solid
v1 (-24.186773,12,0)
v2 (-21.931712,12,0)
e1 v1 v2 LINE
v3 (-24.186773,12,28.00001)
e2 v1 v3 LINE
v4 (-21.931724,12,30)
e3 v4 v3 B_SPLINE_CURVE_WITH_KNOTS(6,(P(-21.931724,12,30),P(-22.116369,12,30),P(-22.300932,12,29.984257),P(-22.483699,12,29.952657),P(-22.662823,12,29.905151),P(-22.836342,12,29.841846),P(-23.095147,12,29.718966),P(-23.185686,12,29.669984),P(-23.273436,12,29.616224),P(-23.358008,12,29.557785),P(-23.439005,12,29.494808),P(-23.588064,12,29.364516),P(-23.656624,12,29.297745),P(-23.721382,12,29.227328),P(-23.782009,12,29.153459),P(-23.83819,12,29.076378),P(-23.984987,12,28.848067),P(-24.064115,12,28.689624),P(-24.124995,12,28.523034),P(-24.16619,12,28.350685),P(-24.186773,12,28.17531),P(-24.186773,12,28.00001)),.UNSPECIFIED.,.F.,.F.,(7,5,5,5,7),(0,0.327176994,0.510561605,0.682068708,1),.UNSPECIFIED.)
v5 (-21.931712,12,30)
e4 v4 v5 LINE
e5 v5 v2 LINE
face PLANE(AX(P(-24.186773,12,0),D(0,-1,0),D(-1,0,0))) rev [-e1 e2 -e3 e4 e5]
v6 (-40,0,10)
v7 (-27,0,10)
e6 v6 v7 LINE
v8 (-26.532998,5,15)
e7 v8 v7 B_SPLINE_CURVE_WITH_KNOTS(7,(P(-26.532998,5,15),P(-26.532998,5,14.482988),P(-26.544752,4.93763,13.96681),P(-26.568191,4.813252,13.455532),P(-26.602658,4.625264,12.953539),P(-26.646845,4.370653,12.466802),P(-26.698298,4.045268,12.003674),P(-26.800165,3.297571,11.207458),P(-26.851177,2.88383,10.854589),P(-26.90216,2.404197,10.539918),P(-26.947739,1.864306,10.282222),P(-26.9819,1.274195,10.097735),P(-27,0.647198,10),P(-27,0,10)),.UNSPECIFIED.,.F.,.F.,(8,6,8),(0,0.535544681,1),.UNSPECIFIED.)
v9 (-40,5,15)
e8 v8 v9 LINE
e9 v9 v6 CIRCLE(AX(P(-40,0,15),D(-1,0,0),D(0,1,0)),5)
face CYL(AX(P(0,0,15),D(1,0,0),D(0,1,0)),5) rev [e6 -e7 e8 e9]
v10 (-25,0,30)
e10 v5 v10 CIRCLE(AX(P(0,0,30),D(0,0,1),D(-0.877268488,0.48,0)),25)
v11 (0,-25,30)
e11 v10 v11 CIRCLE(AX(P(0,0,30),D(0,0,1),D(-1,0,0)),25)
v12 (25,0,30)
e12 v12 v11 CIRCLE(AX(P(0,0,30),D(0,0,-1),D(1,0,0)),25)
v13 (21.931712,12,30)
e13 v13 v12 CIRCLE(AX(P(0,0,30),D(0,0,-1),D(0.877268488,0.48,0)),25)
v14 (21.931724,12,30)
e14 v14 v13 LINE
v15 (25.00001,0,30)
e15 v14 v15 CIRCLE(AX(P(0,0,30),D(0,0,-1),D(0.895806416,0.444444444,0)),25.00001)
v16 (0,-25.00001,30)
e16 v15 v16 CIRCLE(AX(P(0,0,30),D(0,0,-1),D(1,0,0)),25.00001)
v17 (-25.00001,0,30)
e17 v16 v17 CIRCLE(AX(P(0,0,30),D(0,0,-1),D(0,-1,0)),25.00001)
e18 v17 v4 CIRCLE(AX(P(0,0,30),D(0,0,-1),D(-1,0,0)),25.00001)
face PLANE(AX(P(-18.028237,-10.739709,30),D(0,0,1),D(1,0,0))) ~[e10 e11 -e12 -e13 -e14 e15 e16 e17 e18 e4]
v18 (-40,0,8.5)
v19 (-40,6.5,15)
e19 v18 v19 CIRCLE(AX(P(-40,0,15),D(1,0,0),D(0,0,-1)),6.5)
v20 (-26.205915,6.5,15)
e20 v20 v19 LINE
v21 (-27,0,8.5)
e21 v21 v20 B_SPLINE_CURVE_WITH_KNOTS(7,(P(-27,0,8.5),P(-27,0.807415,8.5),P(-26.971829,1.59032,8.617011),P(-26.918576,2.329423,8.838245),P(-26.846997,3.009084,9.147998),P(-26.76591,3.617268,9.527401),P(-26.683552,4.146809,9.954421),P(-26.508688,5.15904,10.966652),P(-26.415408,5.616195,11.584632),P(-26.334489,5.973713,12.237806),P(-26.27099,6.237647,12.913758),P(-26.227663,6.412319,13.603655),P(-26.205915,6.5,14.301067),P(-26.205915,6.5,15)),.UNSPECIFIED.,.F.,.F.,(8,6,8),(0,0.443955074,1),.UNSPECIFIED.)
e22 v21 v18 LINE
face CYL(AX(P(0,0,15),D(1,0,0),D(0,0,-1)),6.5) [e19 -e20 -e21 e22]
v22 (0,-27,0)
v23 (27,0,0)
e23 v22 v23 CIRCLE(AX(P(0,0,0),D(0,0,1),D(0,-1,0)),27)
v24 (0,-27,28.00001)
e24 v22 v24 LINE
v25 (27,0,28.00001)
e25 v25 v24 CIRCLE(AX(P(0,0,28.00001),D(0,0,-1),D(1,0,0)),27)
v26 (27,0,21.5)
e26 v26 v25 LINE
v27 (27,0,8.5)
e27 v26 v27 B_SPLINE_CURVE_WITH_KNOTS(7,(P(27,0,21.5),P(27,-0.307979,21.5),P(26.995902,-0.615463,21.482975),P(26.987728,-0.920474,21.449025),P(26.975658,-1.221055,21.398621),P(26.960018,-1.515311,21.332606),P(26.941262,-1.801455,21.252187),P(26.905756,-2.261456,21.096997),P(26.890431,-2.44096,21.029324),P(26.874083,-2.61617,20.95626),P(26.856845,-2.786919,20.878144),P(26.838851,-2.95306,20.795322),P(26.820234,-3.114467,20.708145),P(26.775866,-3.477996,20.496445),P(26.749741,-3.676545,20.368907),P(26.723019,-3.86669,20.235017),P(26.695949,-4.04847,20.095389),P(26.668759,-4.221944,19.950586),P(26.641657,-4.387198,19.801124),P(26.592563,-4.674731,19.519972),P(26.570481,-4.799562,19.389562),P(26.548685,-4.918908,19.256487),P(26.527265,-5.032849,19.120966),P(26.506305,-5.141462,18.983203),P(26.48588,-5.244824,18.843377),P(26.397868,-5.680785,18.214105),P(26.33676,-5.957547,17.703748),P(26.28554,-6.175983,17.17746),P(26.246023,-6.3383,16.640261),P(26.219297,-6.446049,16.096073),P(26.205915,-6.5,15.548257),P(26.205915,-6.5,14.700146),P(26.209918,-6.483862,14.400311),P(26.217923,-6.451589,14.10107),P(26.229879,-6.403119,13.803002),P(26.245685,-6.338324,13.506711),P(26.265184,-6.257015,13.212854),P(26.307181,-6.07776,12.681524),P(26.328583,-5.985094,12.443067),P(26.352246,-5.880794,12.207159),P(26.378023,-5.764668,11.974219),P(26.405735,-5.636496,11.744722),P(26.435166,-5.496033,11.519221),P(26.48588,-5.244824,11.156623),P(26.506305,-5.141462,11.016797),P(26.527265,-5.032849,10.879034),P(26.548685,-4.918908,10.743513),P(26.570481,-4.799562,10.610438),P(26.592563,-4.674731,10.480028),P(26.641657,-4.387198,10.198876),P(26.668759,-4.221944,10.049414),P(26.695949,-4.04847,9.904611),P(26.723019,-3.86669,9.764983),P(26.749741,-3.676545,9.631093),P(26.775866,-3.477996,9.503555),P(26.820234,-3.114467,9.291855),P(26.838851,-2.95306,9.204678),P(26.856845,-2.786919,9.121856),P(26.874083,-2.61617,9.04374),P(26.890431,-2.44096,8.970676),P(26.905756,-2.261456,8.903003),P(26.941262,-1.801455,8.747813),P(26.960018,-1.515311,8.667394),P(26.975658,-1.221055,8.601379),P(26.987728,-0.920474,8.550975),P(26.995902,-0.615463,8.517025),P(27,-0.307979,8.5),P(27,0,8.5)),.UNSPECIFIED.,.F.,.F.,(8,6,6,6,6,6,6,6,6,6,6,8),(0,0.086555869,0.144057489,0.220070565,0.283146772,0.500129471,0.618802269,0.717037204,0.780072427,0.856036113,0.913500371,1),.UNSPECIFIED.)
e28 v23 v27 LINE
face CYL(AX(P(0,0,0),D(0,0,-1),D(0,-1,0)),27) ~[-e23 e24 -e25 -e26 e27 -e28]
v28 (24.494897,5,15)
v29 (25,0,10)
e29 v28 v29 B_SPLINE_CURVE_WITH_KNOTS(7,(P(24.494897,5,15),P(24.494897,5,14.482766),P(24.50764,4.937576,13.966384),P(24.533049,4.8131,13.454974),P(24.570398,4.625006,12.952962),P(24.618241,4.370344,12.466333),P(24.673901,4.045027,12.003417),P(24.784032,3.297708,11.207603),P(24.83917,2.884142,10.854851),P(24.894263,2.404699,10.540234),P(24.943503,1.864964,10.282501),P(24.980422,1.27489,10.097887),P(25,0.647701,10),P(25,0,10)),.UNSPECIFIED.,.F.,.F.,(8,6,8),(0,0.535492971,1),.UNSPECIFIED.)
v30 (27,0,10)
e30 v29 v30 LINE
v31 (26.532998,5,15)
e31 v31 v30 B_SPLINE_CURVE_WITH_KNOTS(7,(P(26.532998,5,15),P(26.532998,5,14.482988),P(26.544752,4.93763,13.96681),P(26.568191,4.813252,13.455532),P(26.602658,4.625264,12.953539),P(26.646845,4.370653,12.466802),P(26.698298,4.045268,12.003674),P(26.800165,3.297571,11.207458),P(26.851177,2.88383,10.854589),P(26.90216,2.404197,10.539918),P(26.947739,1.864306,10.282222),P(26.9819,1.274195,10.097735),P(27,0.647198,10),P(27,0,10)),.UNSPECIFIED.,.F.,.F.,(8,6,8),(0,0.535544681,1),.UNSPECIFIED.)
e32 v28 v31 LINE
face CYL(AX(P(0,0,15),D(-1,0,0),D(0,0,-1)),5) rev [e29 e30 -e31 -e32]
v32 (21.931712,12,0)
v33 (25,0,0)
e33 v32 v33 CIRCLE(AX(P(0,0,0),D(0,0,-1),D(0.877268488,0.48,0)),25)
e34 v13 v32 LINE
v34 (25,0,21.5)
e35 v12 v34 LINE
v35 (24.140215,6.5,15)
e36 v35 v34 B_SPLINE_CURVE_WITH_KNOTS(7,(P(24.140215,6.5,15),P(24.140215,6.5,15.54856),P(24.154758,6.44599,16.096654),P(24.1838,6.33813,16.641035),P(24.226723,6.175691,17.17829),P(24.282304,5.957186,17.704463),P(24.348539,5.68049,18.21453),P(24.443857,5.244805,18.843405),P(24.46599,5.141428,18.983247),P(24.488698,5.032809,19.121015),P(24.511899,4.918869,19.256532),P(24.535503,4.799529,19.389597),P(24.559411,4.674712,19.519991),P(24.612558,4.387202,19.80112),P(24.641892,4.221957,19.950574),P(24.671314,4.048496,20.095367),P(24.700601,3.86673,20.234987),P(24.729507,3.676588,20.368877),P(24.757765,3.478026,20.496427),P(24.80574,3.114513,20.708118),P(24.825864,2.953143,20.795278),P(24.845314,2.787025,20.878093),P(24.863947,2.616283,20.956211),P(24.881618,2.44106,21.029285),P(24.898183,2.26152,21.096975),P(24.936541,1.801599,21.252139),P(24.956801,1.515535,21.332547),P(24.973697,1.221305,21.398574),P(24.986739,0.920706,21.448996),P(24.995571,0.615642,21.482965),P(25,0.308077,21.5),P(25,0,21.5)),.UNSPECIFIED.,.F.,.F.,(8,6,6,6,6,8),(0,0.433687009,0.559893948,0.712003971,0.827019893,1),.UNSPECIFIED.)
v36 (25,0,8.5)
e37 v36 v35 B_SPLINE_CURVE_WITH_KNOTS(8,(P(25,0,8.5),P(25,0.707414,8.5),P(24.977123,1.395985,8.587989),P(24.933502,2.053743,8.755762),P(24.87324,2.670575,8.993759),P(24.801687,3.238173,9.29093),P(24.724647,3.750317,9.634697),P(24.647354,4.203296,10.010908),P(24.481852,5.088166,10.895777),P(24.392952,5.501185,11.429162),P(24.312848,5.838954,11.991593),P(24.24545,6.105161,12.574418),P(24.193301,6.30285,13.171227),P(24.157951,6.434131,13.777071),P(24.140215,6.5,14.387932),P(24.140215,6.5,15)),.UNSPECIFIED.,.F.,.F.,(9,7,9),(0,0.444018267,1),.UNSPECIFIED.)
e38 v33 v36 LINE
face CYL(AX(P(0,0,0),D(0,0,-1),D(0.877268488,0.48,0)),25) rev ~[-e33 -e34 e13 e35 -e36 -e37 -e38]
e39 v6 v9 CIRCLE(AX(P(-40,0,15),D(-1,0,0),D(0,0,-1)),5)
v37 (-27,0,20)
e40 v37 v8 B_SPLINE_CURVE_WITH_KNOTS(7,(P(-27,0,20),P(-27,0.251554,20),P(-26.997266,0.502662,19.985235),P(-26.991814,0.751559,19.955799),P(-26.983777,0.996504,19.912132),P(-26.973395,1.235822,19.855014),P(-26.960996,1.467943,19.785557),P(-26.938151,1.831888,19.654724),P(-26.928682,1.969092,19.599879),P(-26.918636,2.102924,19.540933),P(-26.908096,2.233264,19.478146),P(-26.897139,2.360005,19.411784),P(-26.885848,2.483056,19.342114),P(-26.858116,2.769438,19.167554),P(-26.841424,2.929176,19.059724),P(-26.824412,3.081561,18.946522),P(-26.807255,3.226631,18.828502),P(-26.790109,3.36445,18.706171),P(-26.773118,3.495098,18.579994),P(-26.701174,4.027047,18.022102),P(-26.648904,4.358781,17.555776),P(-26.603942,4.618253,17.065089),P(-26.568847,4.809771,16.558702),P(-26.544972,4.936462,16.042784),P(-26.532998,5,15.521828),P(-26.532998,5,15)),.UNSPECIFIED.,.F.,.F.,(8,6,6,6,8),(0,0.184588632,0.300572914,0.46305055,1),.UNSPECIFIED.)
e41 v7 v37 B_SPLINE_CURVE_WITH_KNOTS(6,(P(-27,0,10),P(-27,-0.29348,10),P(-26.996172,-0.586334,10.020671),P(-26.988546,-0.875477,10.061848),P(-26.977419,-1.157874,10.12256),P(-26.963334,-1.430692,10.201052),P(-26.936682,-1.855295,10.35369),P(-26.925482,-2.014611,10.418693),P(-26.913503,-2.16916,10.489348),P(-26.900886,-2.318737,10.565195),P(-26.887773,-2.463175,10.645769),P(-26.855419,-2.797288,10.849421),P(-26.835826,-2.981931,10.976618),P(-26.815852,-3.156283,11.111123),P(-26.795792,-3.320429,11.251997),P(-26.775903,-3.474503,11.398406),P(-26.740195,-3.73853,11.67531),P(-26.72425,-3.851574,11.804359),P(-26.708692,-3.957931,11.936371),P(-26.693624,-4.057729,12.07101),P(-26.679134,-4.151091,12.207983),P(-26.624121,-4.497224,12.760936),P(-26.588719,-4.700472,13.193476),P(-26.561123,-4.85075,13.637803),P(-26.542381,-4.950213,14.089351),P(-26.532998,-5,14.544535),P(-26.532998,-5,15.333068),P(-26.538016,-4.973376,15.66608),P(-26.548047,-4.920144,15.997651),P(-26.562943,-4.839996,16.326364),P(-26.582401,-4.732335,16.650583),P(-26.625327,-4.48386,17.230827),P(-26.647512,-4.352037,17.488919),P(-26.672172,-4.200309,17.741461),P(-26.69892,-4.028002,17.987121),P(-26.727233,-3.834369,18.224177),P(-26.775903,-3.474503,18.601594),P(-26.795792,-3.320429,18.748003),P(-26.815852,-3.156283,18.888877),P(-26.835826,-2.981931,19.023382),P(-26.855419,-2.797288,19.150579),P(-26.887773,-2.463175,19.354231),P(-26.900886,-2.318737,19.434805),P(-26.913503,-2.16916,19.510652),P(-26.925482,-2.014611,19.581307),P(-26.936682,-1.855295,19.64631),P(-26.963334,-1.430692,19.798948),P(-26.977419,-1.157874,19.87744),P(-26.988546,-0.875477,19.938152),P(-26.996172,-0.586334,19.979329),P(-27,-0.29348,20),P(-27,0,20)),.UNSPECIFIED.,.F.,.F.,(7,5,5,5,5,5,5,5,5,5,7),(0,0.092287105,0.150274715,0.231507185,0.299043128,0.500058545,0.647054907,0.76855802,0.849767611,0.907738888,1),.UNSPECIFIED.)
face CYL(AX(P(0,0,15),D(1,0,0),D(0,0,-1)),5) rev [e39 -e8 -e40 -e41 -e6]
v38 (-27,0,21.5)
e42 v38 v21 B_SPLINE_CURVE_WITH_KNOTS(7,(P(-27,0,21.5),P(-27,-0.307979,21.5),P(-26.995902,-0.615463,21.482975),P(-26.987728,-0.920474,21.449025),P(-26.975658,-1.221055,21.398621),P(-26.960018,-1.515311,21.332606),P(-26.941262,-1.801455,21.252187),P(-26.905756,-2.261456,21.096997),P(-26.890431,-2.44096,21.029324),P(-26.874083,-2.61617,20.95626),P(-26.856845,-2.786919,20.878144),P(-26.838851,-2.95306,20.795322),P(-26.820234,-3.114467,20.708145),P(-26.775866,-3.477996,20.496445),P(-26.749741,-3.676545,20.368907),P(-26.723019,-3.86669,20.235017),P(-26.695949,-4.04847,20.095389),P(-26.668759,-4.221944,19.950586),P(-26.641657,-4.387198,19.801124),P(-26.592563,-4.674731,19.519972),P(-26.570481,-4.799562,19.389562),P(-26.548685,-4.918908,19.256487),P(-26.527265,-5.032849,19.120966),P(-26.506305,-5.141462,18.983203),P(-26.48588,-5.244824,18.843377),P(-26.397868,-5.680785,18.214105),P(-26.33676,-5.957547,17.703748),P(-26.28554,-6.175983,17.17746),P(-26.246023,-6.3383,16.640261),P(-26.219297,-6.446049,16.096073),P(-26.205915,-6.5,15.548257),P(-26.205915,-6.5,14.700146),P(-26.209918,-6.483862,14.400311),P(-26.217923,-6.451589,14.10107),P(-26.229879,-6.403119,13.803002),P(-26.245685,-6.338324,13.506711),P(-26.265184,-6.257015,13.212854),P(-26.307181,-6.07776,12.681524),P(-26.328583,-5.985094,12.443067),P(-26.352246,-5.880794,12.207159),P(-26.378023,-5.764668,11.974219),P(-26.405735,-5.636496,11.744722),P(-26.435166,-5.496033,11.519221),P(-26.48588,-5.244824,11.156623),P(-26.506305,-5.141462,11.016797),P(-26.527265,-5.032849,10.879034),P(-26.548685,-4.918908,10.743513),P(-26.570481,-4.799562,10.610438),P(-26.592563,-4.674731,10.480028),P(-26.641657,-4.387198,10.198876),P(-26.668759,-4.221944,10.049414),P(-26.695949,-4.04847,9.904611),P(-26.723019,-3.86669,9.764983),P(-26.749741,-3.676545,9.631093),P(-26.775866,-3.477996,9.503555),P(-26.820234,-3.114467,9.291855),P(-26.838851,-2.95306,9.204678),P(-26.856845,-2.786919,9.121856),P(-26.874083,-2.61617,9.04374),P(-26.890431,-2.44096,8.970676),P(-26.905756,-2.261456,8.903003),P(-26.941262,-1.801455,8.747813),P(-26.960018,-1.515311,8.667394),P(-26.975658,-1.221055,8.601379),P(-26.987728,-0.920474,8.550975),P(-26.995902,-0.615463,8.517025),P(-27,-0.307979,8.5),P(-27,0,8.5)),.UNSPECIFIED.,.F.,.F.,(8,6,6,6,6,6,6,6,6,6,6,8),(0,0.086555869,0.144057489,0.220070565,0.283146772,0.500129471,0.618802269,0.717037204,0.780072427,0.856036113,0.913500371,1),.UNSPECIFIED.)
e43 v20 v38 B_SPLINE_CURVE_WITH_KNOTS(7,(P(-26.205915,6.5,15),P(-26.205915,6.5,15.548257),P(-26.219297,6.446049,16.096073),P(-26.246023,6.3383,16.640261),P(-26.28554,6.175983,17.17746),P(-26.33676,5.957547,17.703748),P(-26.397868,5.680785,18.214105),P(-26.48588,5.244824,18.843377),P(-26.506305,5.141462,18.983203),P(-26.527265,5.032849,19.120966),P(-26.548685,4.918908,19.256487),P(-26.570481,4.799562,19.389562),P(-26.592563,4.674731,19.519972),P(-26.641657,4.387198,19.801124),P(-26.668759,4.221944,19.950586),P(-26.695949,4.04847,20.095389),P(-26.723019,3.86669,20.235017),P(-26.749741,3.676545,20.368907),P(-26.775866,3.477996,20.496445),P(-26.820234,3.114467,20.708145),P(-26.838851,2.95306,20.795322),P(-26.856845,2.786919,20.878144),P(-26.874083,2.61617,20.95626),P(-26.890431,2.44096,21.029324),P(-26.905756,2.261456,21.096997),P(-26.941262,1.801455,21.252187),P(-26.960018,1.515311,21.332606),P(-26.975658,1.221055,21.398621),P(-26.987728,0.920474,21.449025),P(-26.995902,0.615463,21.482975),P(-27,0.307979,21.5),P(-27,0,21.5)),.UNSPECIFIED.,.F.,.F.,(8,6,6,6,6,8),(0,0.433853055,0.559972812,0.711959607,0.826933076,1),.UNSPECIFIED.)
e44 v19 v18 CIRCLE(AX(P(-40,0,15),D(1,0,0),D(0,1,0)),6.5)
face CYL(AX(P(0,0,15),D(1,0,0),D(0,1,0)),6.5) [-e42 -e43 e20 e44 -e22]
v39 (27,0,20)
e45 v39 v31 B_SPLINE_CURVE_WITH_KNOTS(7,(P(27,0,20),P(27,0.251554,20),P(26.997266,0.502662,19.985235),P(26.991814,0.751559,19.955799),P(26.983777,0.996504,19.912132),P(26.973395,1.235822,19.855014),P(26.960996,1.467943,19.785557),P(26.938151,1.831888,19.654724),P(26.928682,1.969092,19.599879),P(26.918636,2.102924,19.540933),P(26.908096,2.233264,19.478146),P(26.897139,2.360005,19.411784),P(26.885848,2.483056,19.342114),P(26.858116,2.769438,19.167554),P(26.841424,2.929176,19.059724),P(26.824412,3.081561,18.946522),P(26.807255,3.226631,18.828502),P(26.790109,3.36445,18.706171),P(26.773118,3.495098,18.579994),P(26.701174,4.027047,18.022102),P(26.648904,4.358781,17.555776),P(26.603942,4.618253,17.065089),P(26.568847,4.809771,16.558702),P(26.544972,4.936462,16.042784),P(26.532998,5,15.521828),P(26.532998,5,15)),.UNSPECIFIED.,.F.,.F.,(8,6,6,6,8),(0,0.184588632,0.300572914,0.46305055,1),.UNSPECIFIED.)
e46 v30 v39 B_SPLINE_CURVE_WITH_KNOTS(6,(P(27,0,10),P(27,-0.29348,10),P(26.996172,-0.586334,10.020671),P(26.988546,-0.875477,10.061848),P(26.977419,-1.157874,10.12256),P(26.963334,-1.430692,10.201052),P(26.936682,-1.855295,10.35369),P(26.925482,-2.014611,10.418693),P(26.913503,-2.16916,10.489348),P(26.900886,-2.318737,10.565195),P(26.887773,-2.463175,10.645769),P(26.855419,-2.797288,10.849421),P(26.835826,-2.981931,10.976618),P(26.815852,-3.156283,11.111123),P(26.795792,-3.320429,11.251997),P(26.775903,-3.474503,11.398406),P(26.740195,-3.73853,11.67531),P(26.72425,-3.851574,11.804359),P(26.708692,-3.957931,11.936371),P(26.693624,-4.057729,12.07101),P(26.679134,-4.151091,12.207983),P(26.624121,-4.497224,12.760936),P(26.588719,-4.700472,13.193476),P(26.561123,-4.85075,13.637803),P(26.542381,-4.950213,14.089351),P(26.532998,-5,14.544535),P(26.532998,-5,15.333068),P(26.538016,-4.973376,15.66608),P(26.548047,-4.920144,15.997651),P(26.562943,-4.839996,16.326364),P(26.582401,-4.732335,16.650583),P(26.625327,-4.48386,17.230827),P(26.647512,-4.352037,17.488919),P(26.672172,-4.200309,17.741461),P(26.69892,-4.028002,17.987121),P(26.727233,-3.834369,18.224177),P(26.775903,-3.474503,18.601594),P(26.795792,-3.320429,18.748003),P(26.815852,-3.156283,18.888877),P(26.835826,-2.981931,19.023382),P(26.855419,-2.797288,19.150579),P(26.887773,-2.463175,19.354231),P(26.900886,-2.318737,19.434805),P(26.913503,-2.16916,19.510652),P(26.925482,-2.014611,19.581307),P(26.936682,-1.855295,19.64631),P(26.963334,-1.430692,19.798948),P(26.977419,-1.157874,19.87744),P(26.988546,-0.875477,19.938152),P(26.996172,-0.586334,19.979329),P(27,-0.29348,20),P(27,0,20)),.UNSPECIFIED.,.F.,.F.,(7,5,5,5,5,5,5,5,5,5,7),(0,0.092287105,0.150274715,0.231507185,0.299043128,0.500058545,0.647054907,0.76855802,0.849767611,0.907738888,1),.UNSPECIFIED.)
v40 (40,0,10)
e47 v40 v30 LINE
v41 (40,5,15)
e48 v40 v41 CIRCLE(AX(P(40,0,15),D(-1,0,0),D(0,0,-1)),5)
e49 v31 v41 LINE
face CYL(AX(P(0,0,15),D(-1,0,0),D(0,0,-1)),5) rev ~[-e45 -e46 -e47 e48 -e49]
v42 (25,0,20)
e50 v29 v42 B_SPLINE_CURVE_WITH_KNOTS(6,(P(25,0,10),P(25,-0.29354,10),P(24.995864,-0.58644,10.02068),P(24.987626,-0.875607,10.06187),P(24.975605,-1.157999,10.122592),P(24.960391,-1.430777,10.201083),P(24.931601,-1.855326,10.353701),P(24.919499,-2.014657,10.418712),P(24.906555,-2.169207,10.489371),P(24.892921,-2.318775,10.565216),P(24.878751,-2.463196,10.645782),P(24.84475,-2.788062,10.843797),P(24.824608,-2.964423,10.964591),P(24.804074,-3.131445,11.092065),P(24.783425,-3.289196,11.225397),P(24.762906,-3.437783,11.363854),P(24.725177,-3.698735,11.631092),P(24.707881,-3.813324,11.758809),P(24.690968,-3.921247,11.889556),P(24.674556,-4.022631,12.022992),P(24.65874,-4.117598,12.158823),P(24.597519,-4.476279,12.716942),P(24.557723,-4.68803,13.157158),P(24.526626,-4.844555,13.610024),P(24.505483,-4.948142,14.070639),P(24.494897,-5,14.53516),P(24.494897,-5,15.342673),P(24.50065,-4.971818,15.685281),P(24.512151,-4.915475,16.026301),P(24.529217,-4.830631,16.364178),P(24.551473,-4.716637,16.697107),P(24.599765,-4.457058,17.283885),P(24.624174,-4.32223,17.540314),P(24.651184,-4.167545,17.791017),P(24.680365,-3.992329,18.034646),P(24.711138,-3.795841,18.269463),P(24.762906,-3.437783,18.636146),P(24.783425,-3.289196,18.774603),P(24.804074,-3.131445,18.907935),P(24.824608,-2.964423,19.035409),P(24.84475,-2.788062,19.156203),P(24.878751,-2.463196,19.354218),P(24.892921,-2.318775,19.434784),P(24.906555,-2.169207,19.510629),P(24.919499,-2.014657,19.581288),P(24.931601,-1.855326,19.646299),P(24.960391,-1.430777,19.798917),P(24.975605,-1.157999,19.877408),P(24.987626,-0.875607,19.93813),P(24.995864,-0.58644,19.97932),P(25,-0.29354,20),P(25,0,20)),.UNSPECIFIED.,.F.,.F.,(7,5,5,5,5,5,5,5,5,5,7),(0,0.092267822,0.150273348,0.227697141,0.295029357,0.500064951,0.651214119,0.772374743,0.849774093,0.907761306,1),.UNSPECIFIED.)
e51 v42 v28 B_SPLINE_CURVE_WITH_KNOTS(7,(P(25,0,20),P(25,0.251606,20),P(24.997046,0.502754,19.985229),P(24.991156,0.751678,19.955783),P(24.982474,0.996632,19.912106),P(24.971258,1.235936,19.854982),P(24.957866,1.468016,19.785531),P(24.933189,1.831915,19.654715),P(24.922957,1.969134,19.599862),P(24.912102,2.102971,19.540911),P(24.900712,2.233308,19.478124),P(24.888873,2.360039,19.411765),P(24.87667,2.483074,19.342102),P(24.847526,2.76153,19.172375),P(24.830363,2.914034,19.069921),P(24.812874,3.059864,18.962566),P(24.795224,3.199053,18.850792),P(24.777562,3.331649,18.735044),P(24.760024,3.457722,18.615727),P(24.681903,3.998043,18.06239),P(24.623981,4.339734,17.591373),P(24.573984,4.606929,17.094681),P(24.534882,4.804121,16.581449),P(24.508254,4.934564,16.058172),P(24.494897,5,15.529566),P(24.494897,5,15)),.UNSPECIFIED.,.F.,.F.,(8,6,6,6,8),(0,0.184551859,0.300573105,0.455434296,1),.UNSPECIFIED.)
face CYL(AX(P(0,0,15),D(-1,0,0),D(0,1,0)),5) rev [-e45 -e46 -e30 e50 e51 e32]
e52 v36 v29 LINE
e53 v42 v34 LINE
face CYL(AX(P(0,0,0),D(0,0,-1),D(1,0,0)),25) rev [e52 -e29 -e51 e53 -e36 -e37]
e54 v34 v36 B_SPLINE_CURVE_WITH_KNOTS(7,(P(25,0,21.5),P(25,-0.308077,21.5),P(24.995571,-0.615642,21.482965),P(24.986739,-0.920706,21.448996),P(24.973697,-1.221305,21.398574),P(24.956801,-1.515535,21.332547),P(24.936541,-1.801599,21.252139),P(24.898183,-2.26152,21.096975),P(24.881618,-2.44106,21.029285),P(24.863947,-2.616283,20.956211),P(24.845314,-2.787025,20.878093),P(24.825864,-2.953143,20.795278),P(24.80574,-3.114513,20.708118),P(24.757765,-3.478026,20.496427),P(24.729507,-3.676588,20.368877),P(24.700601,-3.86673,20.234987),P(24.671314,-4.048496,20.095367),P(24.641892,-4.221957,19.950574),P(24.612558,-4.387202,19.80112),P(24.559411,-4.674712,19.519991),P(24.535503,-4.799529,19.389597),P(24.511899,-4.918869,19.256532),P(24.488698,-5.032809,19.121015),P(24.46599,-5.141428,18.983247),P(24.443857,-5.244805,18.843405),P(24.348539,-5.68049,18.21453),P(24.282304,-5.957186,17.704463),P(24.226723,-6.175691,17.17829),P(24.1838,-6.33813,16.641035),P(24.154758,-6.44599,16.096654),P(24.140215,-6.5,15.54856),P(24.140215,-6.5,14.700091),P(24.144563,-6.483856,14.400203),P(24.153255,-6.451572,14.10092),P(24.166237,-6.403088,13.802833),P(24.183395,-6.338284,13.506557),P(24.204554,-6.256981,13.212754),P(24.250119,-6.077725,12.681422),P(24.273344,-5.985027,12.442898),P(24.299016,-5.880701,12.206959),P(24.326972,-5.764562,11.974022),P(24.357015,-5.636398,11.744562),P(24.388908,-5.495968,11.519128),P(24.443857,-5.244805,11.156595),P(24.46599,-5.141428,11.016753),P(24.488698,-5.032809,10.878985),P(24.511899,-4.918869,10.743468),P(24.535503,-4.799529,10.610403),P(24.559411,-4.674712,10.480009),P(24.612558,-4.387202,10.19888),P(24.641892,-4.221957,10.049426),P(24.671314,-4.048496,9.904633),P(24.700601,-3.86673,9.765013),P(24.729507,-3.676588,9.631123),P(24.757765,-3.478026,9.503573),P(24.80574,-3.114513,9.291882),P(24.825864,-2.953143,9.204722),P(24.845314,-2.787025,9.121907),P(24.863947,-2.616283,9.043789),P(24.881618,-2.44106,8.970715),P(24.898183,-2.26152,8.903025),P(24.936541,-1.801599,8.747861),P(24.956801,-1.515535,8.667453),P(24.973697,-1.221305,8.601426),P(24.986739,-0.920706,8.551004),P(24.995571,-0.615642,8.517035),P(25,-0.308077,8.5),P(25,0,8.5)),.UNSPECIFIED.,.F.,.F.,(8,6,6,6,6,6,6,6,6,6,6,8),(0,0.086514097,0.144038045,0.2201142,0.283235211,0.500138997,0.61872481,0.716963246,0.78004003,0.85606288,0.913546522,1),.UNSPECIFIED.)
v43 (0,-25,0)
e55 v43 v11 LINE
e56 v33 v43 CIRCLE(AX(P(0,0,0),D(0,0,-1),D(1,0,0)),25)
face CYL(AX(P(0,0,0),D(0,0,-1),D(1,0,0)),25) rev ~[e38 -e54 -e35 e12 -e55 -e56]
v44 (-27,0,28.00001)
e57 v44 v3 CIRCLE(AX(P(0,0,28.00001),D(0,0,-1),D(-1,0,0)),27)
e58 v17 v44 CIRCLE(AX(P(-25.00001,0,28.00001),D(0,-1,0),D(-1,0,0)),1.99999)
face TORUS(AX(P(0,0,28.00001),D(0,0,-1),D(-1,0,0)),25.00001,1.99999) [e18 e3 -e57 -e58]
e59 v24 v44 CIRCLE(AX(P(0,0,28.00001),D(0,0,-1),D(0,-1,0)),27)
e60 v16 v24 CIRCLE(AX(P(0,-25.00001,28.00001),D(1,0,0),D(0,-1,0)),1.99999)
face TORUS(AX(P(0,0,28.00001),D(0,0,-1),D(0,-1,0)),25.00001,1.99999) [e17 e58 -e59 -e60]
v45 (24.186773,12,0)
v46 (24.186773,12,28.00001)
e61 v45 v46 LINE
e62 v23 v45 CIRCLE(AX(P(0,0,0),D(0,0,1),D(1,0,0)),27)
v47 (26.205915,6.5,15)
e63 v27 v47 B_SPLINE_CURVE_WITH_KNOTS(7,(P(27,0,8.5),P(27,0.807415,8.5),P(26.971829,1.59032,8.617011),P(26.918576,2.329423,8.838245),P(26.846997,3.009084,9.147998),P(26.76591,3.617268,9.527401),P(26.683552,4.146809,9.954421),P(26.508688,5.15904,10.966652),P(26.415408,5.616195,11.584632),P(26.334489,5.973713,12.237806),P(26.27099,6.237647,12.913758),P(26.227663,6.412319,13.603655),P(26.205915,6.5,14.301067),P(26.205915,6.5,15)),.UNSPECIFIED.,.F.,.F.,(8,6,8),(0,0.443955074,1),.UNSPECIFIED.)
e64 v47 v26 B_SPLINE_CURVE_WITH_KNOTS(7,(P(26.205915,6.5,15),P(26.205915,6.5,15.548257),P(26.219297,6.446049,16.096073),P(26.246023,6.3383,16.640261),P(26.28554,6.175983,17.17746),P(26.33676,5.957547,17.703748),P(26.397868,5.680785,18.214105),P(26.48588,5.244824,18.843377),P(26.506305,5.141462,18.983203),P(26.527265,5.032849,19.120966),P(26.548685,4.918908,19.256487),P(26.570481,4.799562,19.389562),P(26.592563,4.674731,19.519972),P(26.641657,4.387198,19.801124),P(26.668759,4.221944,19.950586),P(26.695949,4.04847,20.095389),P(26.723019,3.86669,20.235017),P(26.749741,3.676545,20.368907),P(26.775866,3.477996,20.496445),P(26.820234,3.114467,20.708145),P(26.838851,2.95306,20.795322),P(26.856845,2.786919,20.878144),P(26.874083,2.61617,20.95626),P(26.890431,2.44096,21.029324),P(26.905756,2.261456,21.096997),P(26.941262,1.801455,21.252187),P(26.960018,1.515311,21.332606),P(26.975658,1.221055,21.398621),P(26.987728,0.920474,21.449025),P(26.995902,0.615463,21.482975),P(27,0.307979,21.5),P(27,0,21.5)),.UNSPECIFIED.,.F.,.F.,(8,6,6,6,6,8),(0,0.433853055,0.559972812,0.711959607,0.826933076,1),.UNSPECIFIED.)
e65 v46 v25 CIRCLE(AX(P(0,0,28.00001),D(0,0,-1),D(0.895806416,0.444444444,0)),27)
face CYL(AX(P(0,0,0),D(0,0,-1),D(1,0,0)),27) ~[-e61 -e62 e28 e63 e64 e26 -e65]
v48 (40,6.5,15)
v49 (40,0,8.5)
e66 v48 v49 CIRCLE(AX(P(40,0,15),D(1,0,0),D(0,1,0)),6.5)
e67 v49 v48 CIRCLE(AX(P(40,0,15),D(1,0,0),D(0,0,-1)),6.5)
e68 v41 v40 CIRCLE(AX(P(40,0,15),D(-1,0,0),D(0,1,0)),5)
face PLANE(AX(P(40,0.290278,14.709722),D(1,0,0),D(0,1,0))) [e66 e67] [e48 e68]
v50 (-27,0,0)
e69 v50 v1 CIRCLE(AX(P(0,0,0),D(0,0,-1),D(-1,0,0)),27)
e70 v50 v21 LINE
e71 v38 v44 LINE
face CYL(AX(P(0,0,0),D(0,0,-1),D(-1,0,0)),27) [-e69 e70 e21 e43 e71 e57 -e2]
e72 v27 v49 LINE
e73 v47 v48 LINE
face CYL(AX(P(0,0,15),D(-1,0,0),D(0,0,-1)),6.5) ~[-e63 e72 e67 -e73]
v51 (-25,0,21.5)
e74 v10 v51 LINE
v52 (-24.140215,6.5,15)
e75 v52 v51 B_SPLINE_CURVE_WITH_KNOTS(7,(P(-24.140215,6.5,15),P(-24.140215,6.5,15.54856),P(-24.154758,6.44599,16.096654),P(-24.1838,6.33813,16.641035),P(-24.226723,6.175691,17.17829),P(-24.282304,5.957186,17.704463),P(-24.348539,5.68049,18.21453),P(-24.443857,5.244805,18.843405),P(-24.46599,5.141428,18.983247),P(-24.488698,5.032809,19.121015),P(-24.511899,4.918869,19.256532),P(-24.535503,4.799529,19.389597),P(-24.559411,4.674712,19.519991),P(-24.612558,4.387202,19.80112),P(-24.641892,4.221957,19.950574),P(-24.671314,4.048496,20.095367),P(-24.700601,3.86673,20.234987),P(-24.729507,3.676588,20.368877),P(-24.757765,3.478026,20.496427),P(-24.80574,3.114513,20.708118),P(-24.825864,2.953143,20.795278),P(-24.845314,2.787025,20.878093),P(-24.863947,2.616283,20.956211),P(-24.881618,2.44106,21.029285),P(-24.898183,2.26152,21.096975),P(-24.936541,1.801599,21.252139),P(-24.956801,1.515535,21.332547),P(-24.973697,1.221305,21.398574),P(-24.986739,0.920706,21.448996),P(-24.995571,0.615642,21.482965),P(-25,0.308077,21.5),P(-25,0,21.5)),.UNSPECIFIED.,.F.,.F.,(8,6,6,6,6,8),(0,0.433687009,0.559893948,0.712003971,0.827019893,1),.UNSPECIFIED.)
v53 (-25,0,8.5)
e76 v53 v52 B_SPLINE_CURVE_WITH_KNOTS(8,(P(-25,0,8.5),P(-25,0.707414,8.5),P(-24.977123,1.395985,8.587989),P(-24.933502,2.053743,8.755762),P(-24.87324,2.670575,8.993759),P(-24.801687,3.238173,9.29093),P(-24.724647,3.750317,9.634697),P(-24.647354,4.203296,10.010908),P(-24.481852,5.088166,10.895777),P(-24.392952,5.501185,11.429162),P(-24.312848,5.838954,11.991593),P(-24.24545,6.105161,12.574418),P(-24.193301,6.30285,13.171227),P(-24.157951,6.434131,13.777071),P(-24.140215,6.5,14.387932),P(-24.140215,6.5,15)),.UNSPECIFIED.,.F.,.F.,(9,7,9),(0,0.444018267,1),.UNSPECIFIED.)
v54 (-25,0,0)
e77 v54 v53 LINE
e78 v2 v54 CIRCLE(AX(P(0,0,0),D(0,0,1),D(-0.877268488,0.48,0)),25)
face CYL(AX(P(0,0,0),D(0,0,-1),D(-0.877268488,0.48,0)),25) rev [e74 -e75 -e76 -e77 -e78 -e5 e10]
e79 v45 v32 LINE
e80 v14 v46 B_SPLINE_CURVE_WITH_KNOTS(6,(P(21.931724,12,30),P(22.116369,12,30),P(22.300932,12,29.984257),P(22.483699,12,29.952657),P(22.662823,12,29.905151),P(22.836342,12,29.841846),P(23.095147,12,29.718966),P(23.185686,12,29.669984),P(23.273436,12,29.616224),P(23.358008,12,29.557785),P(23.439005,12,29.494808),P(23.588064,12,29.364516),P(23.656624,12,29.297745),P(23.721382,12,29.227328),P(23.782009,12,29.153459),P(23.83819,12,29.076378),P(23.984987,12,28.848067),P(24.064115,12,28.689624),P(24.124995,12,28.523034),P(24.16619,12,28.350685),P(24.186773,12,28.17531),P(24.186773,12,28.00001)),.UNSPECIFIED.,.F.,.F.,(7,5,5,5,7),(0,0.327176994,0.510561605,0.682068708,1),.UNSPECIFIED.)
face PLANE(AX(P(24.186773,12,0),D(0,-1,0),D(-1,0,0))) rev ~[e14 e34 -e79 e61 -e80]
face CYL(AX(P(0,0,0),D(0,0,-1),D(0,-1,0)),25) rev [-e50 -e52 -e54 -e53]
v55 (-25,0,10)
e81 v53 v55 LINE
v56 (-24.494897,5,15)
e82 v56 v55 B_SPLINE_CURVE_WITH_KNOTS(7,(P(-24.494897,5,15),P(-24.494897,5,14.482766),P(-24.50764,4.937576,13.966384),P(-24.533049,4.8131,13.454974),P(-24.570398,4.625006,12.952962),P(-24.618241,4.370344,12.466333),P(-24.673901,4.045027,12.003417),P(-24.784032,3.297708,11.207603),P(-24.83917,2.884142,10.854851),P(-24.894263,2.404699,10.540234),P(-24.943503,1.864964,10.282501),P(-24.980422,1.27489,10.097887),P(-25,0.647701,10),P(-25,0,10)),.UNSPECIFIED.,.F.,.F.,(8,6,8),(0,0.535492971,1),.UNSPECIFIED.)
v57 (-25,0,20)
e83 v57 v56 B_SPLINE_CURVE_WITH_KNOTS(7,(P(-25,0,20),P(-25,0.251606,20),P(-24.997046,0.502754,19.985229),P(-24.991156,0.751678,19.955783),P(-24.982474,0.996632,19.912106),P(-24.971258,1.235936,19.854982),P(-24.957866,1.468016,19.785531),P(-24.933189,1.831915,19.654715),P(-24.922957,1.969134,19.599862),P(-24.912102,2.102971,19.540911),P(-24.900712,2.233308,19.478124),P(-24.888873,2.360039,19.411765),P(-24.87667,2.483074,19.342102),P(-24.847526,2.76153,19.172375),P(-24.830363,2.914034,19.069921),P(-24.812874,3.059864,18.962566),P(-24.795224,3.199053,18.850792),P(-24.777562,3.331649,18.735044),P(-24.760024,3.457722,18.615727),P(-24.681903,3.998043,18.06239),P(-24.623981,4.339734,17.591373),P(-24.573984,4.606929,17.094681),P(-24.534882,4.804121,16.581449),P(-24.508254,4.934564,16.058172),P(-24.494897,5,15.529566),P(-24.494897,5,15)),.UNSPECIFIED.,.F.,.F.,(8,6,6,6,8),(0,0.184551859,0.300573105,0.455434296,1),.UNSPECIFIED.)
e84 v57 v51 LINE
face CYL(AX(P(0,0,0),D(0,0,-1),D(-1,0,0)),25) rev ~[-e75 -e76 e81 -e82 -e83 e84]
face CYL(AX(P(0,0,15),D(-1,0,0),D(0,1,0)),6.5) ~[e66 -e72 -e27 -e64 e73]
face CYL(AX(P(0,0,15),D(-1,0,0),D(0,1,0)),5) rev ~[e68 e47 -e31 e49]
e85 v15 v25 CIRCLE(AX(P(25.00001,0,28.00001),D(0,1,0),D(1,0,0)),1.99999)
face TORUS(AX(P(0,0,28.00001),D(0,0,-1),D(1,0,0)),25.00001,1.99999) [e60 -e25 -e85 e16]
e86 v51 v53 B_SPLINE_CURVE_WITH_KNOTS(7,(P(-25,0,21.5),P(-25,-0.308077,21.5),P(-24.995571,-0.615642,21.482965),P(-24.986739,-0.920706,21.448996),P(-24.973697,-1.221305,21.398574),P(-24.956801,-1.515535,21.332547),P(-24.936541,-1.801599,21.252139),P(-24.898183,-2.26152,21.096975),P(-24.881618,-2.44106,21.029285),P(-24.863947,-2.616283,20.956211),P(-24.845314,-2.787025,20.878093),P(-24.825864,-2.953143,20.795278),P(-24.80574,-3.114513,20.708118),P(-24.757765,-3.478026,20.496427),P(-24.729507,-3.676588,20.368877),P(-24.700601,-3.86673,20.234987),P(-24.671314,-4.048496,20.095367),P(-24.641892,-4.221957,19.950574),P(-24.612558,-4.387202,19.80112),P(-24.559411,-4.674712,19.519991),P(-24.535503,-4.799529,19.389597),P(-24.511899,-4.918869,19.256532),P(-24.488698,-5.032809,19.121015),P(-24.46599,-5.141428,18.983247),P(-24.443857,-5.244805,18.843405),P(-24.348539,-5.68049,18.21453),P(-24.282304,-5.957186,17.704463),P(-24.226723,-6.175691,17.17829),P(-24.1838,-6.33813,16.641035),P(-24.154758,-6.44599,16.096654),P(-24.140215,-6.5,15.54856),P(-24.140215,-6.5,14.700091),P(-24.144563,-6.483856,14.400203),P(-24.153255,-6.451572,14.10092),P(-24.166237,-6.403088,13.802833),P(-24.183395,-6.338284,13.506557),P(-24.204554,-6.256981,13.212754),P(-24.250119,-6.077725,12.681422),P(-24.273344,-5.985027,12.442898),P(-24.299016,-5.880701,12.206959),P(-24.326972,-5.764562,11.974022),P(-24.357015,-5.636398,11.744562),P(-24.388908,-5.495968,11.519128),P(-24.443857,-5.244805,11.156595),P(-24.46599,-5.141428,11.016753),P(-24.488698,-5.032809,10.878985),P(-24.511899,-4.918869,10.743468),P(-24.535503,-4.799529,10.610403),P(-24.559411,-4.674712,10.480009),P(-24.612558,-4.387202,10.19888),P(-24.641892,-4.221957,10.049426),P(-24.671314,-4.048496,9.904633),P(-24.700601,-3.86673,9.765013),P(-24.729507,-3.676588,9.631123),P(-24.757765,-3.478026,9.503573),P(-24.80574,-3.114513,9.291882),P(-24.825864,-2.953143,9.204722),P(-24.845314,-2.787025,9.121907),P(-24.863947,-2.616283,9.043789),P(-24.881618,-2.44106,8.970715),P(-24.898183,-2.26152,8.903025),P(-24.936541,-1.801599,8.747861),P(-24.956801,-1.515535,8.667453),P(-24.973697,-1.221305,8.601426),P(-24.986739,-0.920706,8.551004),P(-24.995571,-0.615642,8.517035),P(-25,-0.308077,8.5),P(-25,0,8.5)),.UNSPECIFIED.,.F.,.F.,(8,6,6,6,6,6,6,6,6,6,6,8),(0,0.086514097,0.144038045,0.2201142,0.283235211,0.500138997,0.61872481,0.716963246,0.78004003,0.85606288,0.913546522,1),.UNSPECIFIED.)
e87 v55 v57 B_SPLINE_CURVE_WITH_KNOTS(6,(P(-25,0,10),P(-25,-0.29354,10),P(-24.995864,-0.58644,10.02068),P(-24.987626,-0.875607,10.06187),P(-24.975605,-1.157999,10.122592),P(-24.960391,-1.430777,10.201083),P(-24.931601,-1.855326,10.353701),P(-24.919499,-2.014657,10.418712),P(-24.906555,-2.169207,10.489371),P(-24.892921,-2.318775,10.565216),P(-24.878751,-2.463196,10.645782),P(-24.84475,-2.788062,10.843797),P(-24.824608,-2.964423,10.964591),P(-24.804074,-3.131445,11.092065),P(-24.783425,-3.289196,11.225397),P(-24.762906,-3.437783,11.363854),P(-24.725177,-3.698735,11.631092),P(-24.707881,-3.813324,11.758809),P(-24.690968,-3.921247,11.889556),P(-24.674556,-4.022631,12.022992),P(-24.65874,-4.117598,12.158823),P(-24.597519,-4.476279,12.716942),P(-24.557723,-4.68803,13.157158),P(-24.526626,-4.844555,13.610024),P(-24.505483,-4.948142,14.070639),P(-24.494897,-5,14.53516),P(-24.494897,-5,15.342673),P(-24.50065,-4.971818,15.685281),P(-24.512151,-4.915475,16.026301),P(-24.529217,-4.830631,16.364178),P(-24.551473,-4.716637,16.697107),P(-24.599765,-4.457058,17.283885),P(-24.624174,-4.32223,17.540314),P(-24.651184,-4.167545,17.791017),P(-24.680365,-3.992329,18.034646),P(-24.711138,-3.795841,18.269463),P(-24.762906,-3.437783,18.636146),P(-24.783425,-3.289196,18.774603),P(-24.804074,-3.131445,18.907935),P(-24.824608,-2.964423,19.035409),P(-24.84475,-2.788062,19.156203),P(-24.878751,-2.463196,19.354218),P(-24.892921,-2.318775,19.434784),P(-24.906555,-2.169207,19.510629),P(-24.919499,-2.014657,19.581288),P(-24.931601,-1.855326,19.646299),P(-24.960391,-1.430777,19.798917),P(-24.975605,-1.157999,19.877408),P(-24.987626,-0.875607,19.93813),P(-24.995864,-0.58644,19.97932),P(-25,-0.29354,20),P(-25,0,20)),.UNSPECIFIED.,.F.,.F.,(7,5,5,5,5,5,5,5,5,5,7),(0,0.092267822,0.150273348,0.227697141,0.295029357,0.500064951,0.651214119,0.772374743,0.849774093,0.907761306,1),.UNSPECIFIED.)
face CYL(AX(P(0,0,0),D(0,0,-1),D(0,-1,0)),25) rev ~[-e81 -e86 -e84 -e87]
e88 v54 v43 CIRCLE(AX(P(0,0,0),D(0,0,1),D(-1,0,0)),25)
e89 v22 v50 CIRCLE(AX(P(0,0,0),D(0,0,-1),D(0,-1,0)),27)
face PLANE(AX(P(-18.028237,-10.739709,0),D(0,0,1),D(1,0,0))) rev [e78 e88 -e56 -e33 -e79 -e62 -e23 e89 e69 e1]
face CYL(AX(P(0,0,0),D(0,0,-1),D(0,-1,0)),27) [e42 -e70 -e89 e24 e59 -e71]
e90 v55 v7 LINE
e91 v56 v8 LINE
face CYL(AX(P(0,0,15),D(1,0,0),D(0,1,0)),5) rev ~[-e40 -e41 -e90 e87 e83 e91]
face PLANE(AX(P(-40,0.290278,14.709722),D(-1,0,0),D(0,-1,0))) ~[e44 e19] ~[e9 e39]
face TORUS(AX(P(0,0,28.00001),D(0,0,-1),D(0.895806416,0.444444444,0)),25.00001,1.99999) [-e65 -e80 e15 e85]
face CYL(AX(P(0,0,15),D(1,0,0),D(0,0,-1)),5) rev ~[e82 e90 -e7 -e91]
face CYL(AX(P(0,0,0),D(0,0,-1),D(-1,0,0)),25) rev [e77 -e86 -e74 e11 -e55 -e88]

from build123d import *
from build123d import SkipClean  # not in build123d's __all__

# Parameters (mm, degrees)
F1_DEPTH = 30
F3_DEPTH = 40
F4_DEPTH = 25
F5_DEPTH = 30
F7_R     = 1.99999


# Not quite as in the source:
# - a fillet or chamfer is up to 0.001 mm smaller than in the source, because OpenCascade refuses the exact size


with BuildPart() as f1:
    # F0 (on Top) → F1 (new body)
    with BuildSketch(Plane.XY):
        with BuildLine():
            ThreePointArc((25, 0), (17.6776695297, -17.6776695297), (0, -25))
            Line((0, -25), (0, -27))
            ThreePointArc((0, -27), (19.091883092, -19.091883092), (27, 0))
            ThreePointArc((27, 0), (26.2872866383, 6.1626748408), (24.1867732449, 12))
            Line((24.1867732449, 12), (21.9317121995, 12))
            ThreePointArc((21.9317121995, 12), (24.2207845144, 6.1930281371), (25, 0))
        make_face()
    extrude(amount=F1_DEPTH)

    # F2 (on Right) → F3 (join)
    with BuildSketch(Plane.YZ):
        with BuildLine():
            ThreePointArc((6.5, 15), (-4.5961940777, 19.5961940777), (0, 8.5))
            ThreePointArc((0, 8.5), (4.5961940777, 10.4038059223), (6.5, 15))
        make_face()
        with BuildLine():
            ThreePointArc((5, 15), (3.5355339059, 11.4644660941), (0, 10))
            ThreePointArc((0, 10), (-3.5355339059, 18.5355339059), (5, 15))
        make_face(mode=Mode.SUBTRACT)
    extrude(amount=F3_DEPTH)

    # F0 (on Top) → F4 (cut)
    with BuildSketch(Plane.XY):
        with BuildLine():
            Line((0, 0), (0, -25))
            ThreePointArc((0, -25), (17.6776695297, -17.6776695297), (25, 0))
            ThreePointArc((25, 0), (24.2207845144, 6.1930281371), (21.9317121995, 12))
            Line((21.9317121995, 12), (0, 12))
            Line((0, 12), (0, 0))
        make_face()
    extrude(amount=F4_DEPTH, mode=Mode.SUBTRACT)

    # F2 (on Right) → F5 (cut)
    with BuildSketch(Plane.YZ):
        with BuildLine():
            ThreePointArc((5, 15), (-3.5355339059, 18.5355339059), (0, 10))
            ThreePointArc((0, 10), (3.5355339059, 11.4644660941), (5, 15))
        make_face()
    extrude(amount=F5_DEPTH, mode=Mode.SUBTRACT)

    # F6: F1 across plane


with BuildPart() as f1_1:
    add(f1.part, clean=False)
    with SkipClean():  # cleaning this boolean's faces spoils the solid; the shape is the same uncleaned
        add(f1.part.mirror(Plane.YZ), clean=False)

    # F7 (radius 2 in the source; OpenCascade refuses exactly that, so slightly less here)
    f7_edges = [f1_1.edges().sort_by_distance(p)[0] for p in [
        (-22.945588, -14.230249, 30),
        (22.945588, -14.230249, 30),
    ]]
    fillet(f7_edges, radius=F7_R)


solid = f1_1.part
